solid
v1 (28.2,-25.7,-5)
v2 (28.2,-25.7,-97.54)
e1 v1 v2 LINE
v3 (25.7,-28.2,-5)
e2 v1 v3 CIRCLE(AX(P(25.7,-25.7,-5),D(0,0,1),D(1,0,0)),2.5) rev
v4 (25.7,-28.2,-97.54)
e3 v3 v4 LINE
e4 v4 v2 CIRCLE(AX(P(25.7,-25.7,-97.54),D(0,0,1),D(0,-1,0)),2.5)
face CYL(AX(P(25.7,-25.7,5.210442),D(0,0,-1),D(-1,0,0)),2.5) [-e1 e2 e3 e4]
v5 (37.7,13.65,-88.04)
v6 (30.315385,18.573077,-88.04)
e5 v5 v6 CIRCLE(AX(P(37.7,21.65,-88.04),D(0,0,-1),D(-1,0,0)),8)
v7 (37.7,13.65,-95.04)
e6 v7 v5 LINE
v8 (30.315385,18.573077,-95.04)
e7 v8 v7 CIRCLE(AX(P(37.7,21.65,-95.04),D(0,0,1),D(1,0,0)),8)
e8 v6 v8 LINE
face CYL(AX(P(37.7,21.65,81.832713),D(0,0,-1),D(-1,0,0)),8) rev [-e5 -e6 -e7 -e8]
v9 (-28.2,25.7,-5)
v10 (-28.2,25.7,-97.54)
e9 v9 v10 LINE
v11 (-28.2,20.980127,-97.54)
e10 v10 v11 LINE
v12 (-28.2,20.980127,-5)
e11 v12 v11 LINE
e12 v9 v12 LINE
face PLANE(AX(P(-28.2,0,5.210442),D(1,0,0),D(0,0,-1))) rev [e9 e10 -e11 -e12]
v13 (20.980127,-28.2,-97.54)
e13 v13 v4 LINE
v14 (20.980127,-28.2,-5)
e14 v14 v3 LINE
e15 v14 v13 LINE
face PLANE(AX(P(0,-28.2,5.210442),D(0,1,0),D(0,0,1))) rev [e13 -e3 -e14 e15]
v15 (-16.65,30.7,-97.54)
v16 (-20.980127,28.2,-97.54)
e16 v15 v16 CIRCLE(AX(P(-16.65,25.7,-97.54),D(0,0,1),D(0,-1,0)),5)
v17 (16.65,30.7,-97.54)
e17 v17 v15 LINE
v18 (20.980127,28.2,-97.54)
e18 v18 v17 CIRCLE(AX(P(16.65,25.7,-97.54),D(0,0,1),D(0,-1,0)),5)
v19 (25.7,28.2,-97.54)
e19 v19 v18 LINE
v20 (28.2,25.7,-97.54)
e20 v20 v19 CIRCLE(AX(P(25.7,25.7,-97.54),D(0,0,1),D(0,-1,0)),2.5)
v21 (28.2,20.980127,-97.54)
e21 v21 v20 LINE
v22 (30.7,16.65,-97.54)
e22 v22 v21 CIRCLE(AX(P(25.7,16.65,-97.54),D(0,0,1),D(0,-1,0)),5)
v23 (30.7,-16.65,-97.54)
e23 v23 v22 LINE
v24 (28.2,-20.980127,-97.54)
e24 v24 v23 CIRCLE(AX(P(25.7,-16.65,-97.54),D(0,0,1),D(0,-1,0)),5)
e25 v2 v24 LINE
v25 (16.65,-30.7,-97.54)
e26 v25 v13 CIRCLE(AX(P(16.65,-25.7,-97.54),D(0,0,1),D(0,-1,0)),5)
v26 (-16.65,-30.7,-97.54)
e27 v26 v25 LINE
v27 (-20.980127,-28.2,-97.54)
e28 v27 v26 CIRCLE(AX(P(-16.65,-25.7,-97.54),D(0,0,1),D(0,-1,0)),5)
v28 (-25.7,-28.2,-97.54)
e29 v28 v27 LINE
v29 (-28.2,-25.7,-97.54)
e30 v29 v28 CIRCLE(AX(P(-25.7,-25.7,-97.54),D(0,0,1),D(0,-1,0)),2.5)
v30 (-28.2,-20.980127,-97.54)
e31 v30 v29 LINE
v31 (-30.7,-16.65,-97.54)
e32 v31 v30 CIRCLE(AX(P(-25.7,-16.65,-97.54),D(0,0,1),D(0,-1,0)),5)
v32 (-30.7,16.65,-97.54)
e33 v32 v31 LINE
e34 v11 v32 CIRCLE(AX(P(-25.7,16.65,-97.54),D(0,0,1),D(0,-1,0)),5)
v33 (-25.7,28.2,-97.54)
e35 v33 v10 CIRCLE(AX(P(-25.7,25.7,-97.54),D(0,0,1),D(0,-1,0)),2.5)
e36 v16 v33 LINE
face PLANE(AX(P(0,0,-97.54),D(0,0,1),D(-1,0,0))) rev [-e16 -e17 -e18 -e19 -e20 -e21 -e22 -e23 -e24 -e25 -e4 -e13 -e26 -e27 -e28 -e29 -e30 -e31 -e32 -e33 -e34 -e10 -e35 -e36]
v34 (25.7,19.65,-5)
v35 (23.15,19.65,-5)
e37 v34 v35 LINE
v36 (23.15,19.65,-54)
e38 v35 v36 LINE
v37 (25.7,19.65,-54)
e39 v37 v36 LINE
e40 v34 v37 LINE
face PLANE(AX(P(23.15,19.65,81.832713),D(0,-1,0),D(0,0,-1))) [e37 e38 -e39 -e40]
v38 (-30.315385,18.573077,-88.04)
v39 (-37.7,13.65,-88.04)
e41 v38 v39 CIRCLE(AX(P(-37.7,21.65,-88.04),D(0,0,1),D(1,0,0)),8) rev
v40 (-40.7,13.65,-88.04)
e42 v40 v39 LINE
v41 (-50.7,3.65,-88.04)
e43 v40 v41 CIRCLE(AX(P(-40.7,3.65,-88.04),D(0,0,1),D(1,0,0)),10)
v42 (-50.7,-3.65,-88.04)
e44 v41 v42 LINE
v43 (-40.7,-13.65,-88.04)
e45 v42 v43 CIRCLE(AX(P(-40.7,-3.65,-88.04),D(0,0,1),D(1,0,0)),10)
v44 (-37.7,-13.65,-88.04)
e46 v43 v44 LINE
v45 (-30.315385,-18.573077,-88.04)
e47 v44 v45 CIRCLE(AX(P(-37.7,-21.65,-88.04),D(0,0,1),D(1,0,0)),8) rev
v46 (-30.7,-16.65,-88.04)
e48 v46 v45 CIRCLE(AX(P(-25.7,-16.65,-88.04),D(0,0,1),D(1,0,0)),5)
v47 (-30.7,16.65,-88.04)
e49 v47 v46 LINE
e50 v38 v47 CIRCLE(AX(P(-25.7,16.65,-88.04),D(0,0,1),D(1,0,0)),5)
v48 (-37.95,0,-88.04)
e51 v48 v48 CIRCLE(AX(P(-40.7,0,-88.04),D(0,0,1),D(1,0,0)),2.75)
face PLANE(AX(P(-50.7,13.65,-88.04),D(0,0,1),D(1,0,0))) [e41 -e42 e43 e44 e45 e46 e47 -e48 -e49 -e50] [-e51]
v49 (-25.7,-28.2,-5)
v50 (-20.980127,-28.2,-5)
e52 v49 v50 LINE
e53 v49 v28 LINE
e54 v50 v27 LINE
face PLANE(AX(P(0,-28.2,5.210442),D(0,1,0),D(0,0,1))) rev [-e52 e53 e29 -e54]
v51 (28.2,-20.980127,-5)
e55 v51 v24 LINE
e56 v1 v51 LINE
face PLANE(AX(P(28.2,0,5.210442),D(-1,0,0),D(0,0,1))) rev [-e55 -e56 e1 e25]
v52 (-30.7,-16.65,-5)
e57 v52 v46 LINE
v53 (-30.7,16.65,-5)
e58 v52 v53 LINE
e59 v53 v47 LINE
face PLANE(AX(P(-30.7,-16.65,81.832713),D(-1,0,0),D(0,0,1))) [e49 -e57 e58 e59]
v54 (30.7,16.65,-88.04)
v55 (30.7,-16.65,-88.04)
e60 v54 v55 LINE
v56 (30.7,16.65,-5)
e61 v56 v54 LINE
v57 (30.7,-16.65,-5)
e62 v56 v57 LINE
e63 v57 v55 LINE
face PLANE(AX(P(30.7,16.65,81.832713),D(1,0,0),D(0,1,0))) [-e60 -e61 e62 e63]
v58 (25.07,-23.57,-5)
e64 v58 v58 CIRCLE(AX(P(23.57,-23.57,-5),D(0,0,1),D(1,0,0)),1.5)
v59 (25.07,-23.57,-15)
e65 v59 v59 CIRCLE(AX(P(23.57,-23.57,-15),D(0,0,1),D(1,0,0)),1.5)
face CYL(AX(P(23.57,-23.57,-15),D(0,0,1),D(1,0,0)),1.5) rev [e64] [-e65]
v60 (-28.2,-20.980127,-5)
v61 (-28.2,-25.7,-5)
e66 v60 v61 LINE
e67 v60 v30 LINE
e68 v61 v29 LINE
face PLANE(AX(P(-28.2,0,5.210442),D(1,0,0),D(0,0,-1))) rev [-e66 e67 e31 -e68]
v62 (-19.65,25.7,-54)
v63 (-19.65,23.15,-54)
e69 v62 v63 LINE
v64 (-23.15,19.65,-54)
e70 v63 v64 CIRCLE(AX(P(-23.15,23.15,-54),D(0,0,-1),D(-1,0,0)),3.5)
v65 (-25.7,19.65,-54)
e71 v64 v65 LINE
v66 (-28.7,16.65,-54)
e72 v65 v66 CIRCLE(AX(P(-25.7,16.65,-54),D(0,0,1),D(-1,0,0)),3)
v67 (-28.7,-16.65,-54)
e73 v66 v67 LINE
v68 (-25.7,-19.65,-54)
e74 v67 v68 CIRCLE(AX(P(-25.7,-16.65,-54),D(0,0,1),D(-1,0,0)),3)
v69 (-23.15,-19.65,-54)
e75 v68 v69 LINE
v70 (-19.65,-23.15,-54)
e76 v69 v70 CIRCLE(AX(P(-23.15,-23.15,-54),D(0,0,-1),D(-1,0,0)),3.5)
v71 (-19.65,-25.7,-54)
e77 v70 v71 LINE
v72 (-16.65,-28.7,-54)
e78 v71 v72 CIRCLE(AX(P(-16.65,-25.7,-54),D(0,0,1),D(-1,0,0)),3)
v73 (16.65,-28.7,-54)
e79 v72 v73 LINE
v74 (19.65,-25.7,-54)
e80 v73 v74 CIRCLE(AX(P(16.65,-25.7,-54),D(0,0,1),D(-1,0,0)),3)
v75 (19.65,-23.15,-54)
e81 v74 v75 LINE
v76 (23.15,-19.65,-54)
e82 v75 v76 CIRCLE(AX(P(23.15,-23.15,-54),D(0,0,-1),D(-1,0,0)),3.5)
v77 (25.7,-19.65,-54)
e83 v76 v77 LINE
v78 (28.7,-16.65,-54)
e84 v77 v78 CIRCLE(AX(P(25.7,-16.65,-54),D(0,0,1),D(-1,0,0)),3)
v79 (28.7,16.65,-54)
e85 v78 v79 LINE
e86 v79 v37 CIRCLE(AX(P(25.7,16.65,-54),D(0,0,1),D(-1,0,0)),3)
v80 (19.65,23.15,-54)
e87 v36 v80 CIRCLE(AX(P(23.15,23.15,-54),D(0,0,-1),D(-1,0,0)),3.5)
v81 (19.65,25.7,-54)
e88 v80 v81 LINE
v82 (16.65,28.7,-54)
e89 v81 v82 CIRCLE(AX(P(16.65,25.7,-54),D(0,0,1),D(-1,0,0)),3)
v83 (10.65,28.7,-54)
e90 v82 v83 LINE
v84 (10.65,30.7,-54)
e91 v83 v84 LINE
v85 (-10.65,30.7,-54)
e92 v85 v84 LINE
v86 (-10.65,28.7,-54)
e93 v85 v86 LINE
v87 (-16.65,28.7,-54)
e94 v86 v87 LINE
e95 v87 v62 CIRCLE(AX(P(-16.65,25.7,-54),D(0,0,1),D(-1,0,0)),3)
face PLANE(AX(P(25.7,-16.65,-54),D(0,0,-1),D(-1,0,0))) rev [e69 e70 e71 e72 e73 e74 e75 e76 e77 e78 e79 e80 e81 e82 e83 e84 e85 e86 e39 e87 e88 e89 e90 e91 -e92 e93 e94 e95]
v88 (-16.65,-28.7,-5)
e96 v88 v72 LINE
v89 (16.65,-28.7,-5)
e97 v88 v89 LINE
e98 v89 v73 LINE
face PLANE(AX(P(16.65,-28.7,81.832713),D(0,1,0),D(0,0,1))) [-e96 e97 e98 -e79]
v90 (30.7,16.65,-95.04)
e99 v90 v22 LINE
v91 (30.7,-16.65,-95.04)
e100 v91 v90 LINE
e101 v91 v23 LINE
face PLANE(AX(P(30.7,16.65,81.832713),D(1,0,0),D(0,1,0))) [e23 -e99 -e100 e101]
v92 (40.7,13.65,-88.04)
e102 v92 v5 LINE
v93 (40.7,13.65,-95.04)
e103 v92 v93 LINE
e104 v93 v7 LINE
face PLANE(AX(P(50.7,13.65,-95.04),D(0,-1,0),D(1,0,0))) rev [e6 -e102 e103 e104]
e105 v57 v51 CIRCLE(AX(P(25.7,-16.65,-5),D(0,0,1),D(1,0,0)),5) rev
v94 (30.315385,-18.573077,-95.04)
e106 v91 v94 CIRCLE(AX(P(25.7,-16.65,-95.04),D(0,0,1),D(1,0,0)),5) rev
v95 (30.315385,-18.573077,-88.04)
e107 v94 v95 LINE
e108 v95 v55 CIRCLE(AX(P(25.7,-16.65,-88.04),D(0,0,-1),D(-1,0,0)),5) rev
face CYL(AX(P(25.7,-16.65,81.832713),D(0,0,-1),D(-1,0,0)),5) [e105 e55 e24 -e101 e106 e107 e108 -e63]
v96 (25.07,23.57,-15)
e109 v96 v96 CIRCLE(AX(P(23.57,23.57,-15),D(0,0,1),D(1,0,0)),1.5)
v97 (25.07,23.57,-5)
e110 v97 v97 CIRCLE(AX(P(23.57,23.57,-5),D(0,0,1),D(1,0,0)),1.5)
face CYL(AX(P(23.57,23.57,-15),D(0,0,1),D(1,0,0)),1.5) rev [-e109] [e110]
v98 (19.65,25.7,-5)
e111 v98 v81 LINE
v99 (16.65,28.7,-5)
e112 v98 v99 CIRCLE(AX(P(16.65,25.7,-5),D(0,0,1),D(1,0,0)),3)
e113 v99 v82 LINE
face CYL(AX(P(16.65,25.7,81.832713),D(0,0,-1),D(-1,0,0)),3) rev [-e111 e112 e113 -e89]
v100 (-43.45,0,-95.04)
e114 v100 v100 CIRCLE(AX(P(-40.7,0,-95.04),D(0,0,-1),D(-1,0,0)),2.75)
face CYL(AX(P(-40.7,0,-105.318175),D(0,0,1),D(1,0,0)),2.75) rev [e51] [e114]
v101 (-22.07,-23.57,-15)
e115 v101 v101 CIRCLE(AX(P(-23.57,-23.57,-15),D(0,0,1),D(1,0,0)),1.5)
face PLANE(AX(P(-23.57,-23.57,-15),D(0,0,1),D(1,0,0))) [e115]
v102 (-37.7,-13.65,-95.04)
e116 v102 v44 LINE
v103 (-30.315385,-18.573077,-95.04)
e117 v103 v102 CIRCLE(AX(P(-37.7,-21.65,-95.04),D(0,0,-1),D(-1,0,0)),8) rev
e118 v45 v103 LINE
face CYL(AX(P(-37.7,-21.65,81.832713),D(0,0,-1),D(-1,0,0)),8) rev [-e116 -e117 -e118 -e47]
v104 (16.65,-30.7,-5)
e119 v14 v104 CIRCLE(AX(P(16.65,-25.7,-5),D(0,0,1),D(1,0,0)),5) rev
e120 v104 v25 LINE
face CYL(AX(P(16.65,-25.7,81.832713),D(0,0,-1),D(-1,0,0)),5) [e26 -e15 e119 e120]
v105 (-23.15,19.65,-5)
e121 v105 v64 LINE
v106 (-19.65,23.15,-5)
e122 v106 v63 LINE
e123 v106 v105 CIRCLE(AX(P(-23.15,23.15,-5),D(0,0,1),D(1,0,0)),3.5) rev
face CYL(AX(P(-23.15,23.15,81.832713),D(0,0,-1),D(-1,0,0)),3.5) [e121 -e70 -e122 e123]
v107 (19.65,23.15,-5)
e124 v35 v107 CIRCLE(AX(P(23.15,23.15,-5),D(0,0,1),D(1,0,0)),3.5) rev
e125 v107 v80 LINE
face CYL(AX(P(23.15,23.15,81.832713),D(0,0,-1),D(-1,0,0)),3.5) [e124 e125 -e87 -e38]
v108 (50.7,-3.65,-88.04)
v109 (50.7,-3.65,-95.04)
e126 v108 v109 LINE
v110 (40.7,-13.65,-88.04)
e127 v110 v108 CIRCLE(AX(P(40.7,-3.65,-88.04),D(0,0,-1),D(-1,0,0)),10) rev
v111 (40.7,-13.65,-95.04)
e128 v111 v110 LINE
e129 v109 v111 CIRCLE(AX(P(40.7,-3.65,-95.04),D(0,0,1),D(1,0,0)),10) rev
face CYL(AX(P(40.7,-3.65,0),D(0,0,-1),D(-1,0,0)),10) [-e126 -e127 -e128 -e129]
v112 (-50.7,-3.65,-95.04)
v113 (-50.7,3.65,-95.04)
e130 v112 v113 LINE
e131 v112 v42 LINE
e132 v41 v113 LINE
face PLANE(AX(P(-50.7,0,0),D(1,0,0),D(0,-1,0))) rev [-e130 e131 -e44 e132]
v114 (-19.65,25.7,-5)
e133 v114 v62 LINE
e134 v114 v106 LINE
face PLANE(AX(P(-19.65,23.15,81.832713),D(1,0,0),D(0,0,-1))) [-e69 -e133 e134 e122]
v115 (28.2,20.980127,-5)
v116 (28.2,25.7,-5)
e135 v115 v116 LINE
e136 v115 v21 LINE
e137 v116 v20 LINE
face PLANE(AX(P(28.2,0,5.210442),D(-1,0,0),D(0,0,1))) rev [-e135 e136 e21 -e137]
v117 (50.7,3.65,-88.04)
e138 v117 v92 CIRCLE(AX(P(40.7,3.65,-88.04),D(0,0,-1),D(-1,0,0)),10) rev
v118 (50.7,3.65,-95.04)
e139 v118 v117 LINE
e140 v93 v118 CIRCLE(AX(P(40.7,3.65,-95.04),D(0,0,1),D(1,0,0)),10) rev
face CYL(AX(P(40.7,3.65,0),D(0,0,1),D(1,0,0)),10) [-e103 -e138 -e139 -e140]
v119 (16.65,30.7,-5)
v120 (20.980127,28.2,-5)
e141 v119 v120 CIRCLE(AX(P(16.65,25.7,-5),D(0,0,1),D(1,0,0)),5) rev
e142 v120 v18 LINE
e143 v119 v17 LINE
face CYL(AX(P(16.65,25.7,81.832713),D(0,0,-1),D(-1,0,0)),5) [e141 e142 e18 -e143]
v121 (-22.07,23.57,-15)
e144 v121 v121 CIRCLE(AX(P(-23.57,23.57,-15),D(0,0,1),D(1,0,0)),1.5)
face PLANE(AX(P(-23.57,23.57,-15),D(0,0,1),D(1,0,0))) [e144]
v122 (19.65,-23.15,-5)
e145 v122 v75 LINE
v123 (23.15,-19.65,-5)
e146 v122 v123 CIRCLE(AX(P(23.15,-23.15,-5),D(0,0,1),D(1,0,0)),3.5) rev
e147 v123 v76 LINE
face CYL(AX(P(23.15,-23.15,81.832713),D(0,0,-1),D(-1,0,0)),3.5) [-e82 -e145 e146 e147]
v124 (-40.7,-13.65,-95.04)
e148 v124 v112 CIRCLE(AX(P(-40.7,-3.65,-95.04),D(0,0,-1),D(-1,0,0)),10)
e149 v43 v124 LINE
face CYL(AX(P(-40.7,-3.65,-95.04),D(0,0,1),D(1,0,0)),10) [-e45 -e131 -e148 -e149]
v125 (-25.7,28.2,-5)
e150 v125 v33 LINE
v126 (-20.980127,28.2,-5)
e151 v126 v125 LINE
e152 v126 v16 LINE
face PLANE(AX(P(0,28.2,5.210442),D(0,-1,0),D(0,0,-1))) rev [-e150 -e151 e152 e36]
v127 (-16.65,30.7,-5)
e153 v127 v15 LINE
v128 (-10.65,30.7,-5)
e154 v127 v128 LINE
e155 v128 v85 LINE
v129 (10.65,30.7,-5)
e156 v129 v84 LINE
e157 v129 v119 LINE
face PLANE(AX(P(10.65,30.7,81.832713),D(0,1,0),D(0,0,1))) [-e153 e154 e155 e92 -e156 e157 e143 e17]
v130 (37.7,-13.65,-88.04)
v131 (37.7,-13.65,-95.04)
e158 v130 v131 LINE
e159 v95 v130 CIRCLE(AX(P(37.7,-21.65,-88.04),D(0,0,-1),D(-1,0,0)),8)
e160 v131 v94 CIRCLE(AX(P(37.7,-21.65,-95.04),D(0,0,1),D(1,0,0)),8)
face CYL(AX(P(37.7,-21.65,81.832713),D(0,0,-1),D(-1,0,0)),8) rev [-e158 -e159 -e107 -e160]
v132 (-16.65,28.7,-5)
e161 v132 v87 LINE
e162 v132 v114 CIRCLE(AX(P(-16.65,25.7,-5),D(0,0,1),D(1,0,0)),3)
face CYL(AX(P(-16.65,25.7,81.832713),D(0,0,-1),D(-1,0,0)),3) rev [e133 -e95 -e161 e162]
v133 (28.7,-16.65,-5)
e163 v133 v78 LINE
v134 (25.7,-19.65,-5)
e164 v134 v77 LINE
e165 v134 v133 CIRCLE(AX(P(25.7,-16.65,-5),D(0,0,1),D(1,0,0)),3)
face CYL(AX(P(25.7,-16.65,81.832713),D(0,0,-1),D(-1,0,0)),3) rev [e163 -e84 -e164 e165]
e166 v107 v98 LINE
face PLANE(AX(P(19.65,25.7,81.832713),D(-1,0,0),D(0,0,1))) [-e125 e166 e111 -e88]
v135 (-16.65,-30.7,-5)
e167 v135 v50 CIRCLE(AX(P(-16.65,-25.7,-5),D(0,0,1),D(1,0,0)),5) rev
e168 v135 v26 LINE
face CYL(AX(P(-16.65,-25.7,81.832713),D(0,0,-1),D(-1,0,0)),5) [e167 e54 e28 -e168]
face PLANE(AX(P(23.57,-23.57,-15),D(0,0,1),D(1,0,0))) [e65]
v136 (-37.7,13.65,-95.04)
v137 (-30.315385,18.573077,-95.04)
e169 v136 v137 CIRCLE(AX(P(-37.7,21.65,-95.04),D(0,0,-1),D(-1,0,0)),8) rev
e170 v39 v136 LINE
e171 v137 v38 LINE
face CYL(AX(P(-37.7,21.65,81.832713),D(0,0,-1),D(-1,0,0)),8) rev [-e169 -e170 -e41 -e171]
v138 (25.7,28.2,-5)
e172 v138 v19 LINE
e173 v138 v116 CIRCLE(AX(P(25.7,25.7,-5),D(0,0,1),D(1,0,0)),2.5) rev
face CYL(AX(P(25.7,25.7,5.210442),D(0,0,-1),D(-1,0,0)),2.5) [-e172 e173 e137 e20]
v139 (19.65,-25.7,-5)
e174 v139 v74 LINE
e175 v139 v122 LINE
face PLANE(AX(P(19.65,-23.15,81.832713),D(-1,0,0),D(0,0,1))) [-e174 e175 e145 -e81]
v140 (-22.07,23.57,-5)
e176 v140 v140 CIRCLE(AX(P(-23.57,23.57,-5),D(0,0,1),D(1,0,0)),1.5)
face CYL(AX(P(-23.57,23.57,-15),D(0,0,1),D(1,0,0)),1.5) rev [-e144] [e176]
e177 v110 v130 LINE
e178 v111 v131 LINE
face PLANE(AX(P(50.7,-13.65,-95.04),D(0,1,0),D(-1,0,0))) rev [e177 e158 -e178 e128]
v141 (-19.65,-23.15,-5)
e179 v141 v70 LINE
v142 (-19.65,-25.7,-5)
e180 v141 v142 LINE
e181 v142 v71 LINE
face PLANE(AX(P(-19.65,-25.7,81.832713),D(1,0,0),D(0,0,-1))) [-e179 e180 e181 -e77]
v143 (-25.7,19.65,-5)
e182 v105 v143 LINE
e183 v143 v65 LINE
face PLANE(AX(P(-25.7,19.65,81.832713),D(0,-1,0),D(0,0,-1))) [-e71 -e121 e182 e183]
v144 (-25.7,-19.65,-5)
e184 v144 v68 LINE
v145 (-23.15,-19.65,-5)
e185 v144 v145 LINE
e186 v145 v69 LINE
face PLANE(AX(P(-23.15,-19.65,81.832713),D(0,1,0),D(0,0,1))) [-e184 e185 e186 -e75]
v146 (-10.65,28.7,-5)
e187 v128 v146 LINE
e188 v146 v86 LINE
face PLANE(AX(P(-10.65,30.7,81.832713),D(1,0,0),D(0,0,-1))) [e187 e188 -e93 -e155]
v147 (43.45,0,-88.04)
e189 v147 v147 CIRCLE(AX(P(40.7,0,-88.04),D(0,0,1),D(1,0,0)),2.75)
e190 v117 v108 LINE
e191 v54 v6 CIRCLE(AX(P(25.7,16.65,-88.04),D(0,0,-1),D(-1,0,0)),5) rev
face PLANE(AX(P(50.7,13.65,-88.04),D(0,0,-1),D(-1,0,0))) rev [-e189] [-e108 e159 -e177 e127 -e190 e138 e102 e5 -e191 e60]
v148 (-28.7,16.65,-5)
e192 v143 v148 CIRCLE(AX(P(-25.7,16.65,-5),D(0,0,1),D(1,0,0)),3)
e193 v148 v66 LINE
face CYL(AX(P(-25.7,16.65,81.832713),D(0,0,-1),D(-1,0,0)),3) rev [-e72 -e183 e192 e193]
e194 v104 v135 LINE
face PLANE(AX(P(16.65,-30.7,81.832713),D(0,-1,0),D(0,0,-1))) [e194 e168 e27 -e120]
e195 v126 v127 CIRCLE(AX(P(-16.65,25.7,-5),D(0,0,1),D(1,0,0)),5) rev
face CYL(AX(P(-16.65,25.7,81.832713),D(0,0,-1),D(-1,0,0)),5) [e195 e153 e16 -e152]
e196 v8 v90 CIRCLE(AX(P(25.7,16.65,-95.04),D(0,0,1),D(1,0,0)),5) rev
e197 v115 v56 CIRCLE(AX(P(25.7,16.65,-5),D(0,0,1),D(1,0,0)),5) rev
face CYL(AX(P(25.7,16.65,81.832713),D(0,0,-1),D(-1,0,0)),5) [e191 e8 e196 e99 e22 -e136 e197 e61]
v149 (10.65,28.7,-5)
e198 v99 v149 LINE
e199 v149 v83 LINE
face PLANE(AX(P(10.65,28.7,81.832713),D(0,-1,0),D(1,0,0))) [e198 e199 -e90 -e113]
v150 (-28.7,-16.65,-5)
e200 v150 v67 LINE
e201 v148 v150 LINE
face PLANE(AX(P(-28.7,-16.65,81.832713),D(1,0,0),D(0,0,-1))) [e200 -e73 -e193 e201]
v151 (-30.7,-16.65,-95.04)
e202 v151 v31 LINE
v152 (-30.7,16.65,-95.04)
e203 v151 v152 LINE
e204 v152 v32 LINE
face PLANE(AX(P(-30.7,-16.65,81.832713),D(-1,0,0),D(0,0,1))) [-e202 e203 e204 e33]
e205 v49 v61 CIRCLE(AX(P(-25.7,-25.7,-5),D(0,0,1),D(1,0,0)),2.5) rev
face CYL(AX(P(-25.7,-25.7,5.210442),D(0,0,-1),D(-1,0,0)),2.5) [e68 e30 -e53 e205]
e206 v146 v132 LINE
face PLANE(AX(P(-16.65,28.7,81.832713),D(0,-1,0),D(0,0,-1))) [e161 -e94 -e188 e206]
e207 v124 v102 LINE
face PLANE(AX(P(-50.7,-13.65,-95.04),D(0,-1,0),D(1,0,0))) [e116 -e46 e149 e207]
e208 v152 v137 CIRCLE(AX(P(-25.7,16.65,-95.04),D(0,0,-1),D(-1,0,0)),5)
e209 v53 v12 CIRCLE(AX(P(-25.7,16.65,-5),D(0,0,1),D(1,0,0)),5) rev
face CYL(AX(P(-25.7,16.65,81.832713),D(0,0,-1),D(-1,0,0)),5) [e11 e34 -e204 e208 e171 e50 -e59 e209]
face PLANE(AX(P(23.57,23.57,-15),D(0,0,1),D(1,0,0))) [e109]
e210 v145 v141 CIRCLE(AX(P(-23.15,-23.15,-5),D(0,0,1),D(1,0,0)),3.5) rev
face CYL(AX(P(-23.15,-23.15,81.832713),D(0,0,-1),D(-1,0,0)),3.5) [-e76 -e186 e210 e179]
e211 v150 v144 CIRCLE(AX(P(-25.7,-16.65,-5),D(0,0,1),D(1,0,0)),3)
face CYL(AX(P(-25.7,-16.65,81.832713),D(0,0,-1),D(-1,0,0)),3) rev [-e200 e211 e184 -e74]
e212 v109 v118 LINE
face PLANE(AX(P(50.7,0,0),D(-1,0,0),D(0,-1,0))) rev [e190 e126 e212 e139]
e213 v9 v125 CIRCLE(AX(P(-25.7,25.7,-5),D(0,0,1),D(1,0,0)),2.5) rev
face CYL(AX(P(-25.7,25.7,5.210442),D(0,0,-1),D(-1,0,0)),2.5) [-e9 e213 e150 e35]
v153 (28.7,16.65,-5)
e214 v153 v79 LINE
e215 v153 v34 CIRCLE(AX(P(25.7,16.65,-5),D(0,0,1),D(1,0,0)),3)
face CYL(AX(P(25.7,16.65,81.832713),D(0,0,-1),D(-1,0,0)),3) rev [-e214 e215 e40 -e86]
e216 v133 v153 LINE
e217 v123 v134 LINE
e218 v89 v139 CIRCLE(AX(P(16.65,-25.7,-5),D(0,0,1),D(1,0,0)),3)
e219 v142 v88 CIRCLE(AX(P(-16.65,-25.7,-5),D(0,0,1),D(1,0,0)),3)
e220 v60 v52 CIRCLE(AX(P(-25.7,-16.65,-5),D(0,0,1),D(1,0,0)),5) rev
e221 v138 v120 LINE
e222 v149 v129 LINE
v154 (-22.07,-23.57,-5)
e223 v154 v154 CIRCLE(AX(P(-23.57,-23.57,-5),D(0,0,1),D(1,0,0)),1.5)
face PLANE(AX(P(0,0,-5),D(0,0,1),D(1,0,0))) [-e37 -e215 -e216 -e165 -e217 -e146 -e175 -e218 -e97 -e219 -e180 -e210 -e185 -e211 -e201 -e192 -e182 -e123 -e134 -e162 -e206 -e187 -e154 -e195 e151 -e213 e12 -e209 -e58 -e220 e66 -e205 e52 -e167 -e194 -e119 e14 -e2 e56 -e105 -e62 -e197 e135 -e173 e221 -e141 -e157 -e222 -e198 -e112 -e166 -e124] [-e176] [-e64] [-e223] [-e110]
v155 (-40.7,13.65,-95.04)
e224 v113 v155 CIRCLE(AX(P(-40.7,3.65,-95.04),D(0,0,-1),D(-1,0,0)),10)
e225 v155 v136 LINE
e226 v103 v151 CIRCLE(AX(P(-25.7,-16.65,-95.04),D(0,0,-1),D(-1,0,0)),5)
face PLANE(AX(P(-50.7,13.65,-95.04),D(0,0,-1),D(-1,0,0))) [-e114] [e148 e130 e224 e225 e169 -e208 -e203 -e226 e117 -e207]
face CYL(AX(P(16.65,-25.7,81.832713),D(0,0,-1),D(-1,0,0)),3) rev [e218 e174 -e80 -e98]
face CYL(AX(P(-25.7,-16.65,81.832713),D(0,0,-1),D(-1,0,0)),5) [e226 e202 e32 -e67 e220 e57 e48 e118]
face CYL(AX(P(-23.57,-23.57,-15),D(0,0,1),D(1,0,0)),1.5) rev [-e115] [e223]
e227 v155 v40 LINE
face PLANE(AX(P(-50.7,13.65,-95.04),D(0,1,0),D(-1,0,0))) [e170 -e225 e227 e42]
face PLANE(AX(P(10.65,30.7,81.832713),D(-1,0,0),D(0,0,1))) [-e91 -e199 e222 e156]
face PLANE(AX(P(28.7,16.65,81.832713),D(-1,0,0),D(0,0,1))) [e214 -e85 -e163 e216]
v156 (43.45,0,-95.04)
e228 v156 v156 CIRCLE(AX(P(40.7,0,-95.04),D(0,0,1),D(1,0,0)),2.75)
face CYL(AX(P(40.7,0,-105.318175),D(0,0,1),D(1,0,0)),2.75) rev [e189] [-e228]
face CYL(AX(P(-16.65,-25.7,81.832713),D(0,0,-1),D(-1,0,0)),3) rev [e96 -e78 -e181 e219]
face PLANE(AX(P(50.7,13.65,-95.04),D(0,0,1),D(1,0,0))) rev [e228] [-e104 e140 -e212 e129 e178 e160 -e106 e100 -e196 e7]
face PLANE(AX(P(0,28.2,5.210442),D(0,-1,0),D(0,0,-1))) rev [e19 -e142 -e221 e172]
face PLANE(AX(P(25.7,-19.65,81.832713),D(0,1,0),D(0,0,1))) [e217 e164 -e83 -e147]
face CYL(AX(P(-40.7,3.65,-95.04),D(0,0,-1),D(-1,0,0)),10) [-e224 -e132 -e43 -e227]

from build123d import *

# Parameters (mm, degrees)
BOSS_EXTRUDE1_DEPTH = 49
BOSS_EXTRUDE2_START = 1.5
BOSS_EXTRUDE2_DEPTH = 1.5
BOSS_EXTRUDE3_DEPTH = 50.5
SKETCH4_R           = 1.5
CUT_EXTRUDE1_DEPTH  = 10
BOSS_EXTRUDE4_START = 42.04
BOSS_EXTRUDE4_DEPTH = 42.04
SKETCH7_W           = 7
SKETCH7_H           = 27.3
BOSS_EXTRUDE5_DEPTH = 20
FILLET1_R           = 10
FILLET2_R           = 8
FILLET3_R           = 10
FILLET4_R           = 8
SKETCH8_R           = 2.75
CUT_EXTRUDE2_DEPTH  = 9.5


with BuildPart() as part:
    # Sketch1 → Boss-Extrude1 (new body)
    with BuildSketch(Plane(origin=(0, 0, -54), x_dir=(-1, 0, 0), z_dir=(0, 0, -1))):
        with BuildLine():
            Line((-25.7, -19.65), (-23.15, -19.65))
            ThreePointArc((-23.15, -19.65), (-20.675126266, -20.675126266), (-19.65, -23.15))
            Line((-19.65, -23.15), (-19.65, -25.7))
            ThreePointArc((-19.65, -25.7), (-18.771320344, -27.821320344), (-16.65, -28.7))
            Line((-16.65, -28.7), (16.65, -28.7))
            ThreePointArc((16.65, -28.7), (18.771320344, -27.821320344), (19.65, -25.7))
            Line((19.65, -25.7), (19.65, -23.15))
            ThreePointArc((19.65, -23.15), (20.675126266, -20.675126266), (23.15, -19.65))
            Line((23.15, -19.65), (25.7, -19.65))
            ThreePointArc((25.7, -19.65), (27.821320344, -18.771320344), (28.7, -16.65))
            Line((28.7, -16.65), (28.7, 16.65))
            ThreePointArc((28.7, 16.65), (27.821320344, 18.771320344), (25.7, 19.65))
            Line((25.7, 19.65), (23.15, 19.65))
            ThreePointArc((23.15, 19.65), (20.675126266, 20.675126266), (19.65, 23.15))
            Line((19.65, 23.15), (19.65, 25.7))
            ThreePointArc((19.65, 25.7), (18.771320344, 27.821320344), (16.65, 28.7))
            Line((16.65, 28.7), (10.65, 28.7))
            Line((10.65, 28.7), (10.65, 30.7))
            Line((10.65, 30.7), (16.65, 30.7))
            ThreePointArc((16.65, 30.7), (20.185533906, 29.235533906), (21.65, 25.7))
            Line((21.65, 25.7), (21.65, 23.15))
            ThreePointArc((21.65, 23.15), (22.089339828, 22.089339828), (23.15, 21.65))
            Line((23.15, 21.65), (25.7, 21.65))
            ThreePointArc((25.7, 21.65), (29.235533906, 20.185533906), (30.7, 16.65))
            Line((30.7, 16.65), (30.7, -16.65))
            ThreePointArc((30.7, -16.65), (29.235533906, -20.185533906), (25.7, -21.65))
            Line((25.7, -21.65), (23.15, -21.65))
            ThreePointArc((23.15, -21.65), (22.089339828, -22.089339828), (21.65, -23.15))
            Line((21.65, -23.15), (21.65, -25.7))
            ThreePointArc((21.65, -25.7), (20.185533906, -29.235533906), (16.65, -30.7))
            Line((16.65, -30.7), (-16.65, -30.7))
            ThreePointArc((-16.65, -30.7), (-20.185533906, -29.235533906), (-21.65, -25.7))
            Line((-21.65, -25.7), (-21.65, -23.15))
            ThreePointArc((-21.65, -23.15), (-22.089339828, -22.089339828), (-23.15, -21.65))
            Line((-23.15, -21.65), (-25.7, -21.65))
            ThreePointArc((-25.7, -21.65), (-29.235533906, -20.185533906), (-30.7, -16.65))
            Line((-30.7, -16.65), (-30.7, 16.65))
            ThreePointArc((-30.7, 16.65), (-29.235533906, 20.185533906), (-25.7, 21.65))
            Line((-25.7, 21.65), (-23.15, 21.65))
            ThreePointArc((-23.15, 21.65), (-22.089339828, 22.089339828), (-21.65, 23.15))
            Line((-21.65, 23.15), (-21.65, 25.7))
            ThreePointArc((-21.65, 25.7), (-20.185533906, 29.235533906), (-16.65, 30.7))
            Line((-16.65, 30.7), (-10.65, 30.7))
            Line((-10.65, 30.7), (-10.65, 28.7))
            Line((-10.65, 28.7), (-16.65, 28.7))
            ThreePointArc((-16.65, 28.7), (-18.771320344, 27.821320344), (-19.65, 25.7))
            Line((-19.65, 25.7), (-19.65, 23.15))
            ThreePointArc((-19.65, 23.15), (-20.675126266, 20.675126266), (-23.15, 19.65))
            Line((-23.15, 19.65), (-25.7, 19.65))
            ThreePointArc((-25.7, 19.65), (-27.821320344, 18.771320344), (-28.7, 16.65))
            Line((-28.7, 16.65), (-28.7, -16.65))
            ThreePointArc((-28.7, -16.65), (-27.821320344, -18.771320344), (-25.7, -19.65))
        make_face()
    extrude(amount=-BOSS_EXTRUDE1_DEPTH)

    # Sketch2 → Boss-Extrude2 (add)
    with BuildSketch(Plane(origin=(0, 0, -54), x_dir=(-1, 0, 0), z_dir=(0, 0, -1)).offset(BOSS_EXTRUDE2_START)):
        with BuildLine():
            Line((-10.65, 30.7), (10.65, 30.7))
            Line((10.65, 30.7), (16.65, 30.7))
            ThreePointArc((16.65, 30.7), (20.185533906, 29.235533906), (21.65, 25.7))
            Line((21.65, 25.7), (21.65, 23.15))
            ThreePointArc((21.65, 23.15), (22.089339828, 22.089339828), (23.15, 21.65))
            Line((23.15, 21.65), (25.7, 21.65))
            ThreePointArc((25.7, 21.65), (29.235533906, 20.185533906), (30.7, 16.65))
            Line((30.7, 16.65), (30.7, -16.65))
            ThreePointArc((30.7, -16.65), (29.235533906, -20.185533906), (25.7, -21.65))
            Line((25.7, -21.65), (23.15, -21.65))
            ThreePointArc((23.15, -21.65), (22.089339828, -22.089339828), (21.65, -23.15))
            Line((21.65, -23.15), (21.65, -25.7))
            ThreePointArc((21.65, -25.7), (20.185533906, -29.235533906), (16.65, -30.7))
            Line((16.65, -30.7), (-16.65, -30.7))
            ThreePointArc((-16.65, -30.7), (-20.185533906, -29.235533906), (-21.65, -25.7))
            Line((-21.65, -25.7), (-21.65, -23.15))
            ThreePointArc((-21.65, -23.15), (-22.089339828, -22.089339828), (-23.15, -21.65))
            Line((-23.15, -21.65), (-25.7, -21.65))
            ThreePointArc((-25.7, -21.65), (-29.235533906, -20.185533906), (-30.7, -16.65))
            Line((-30.7, -16.65), (-30.7, 16.65))
            ThreePointArc((-30.7, 16.65), (-29.235533906, 20.185533906), (-25.7, 21.65))
            Line((-25.7, 21.65), (-23.15, 21.65))
            ThreePointArc((-23.15, 21.65), (-22.089339828, 22.089339828), (-21.65, 23.15))
            Line((-21.65, 23.15), (-21.65, 25.7))
            ThreePointArc((-21.65, 25.7), (-20.185533906, 29.235533906), (-16.65, 30.7))
            Line((-16.65, 30.7), (-10.65, 30.7))
        make_face()
    extrude(amount=-BOSS_EXTRUDE2_DEPTH)

    # Sketch3 → Boss-Extrude3 (add)
    with BuildSketch(Plane(origin=(0, 0, -55.5), x_dir=(-1, 0, 0), z_dir=(0, 0, -1))):
        with BuildLine():
            Line((-21.65, 23.15), (-21.65, 25.7))
            ThreePointArc((-21.65, 25.7), (-21.479629131, 26.994095226), (-20.980127019, 28.2))
            Line((-20.980127019, 28.2), (-25.7, 28.2))
            ThreePointArc((-25.7, 28.2), (-27.467766953, 27.467766953), (-28.2, 25.7))
            Line((-28.2, 25.7), (-28.2, 20.980127019))
            ThreePointArc((-28.2, 20.980127019), (-26.994095226, 21.479629131), (-25.7, 21.65))
            Line((-25.7, 21.65), (-23.15, 21.65))
            ThreePointArc((-23.15, 21.65), (-22.089339828, 22.089339828), (-21.65, 23.15))
        make_face()
        with BuildLine():
            Line((21.65, 25.7), (21.65, 23.15))
            ThreePointArc((21.65, 23.15), (22.089339828, 22.089339828), (23.15, 21.65))
            Line((23.15, 21.65), (25.7, 21.65))
            ThreePointArc((25.7, 21.65), (26.994095226, 21.479629131), (28.2, 20.980127019))
            Line((28.2, 20.980127019), (28.2, 25.7))
            ThreePointArc((28.2, 25.7), (27.467766953, 27.467766953), (25.7, 28.2))
            Line((25.7, 28.2), (20.980127019, 28.2))
            ThreePointArc((20.980127019, 28.2), (21.479629131, 26.994095226), (21.65, 25.7))
        make_face()
        with BuildLine():
            Line((-23.15, -21.65), (-25.7, -21.65))
            ThreePointArc((-25.7, -21.65), (-26.994095226, -21.479629131), (-28.2, -20.980127019))
            Line((-28.2, -20.980127019), (-28.2, -25.7))
            ThreePointArc((-28.2, -25.7), (-27.467766953, -27.467766953), (-25.7, -28.2))
            Line((-25.7, -28.2), (-20.980127019, -28.2))
            ThreePointArc((-20.980127019, -28.2), (-21.479629131, -26.994095226), (-21.65, -25.7))
            Line((-21.65, -25.7), (-21.65, -23.15))
            ThreePointArc((-21.65, -23.15), (-22.089339828, -22.089339828), (-23.15, -21.65))
        make_face()
        with BuildLine():
            Line((20.980127019, -28.2), (25.7, -28.2))
            ThreePointArc((25.7, -28.2), (27.467766953, -27.467766953), (28.2, -25.7))
            Line((28.2, -25.7), (28.2, -20.980127019))
            ThreePointArc((28.2, -20.980127019), (26.994095226, -21.479629131), (25.7, -21.65))
            Line((25.7, -21.65), (23.15, -21.65))
            ThreePointArc((23.15, -21.65), (22.089339828, -22.089339828), (21.65, -23.15))
            Line((21.65, -23.15), (21.65, -25.7))
            ThreePointArc((21.65, -25.7), (21.479629131, -26.994095226), (20.980127019, -28.2))
        make_face()
    extrude(amount=-BOSS_EXTRUDE3_DEPTH)

    # Sketch4 → Cut-Extrude1 (cut)
    with BuildSketch(Plane.XY.offset(-5)):
        with Locations((-23.57, 23.57)):
            Circle(SKETCH4_R)
        with Locations((23.57, 23.57)):
            Circle(SKETCH4_R)
        with Locations((-23.57, -23.57)):
            Circle(SKETCH4_R)
        with Locations((23.57, -23.57)):
            Circle(SKETCH4_R)
    extrude(amount=-CUT_EXTRUDE1_DEPTH, mode=Mode.SUBTRACT)

    # Sketch5 → Boss-Extrude4 (add)
    with BuildSketch(Plane(origin=(0, 0, -55.5), x_dir=(-1, 0, 0), z_dir=(0, 0, -1)).offset(BOSS_EXTRUDE4_START)):
        with BuildLine():
            Line((28.2, -25.7), (28.2, -20.980127019))
            ThreePointArc((28.2, -20.980127019), (30.030127019, -19.15), (30.7, -16.65))
            Line((30.7, -16.65), (30.7, 16.65))
            ThreePointArc((30.7, 16.65), (30.030127019, 19.15), (28.2, 20.980127019))
            Line((28.2, 20.980127019), (28.2, 25.7))
            ThreePointArc((28.2, 25.7), (27.467766953, 27.467766953), (25.7, 28.2))
            Line((25.7, 28.2), (20.980127019, 28.2))
            ThreePointArc((20.980127019, 28.2), (19.15, 30.030127019), (16.65, 30.7))
            Line((16.65, 30.7), (-16.65, 30.7))
            ThreePointArc((-16.65, 30.7), (-19.15, 30.030127019), (-20.980127019, 28.2))
            Line((-20.980127019, 28.2), (-25.7, 28.2))
            ThreePointArc((-25.7, 28.2), (-27.467766953, 27.467766953), (-28.2, 25.7))
            Line((-28.2, 25.7), (-28.2, 20.980127019))
            ThreePointArc((-28.2, 20.980127019), (-30.030127019, 19.15), (-30.7, 16.65))
            Line((-30.7, 16.65), (-30.7, -16.65))
            ThreePointArc((-30.7, -16.65), (-30.030127019, -19.15), (-28.2, -20.980127019))
            Line((-28.2, -20.980127019), (-28.2, -25.7))
            ThreePointArc((-28.2, -25.7), (-27.467766953, -27.467766953), (-25.7, -28.2))
            Line((-25.7, -28.2), (-20.980127019, -28.2))
            ThreePointArc((-20.980127019, -28.2), (-19.15, -30.030127019), (-16.65, -30.7))
            Line((-16.65, -30.7), (16.65, -30.7))
            ThreePointArc((16.65, -30.7), (19.15, -30.030127019), (20.980127019, -28.2))
            Line((20.980127019, -28.2), (25.7, -28.2))
            ThreePointArc((25.7, -28.2), (27.467766953, -27.467766953), (28.2, -25.7))
        make_face()
    extrude(amount=-BOSS_EXTRUDE4_DEPTH)

    # Sketch7 → Boss-Extrude5 (add)
    with BuildSketch(Plane(origin=(30.7, 0, 0), x_dir=(0, 0, -1), z_dir=(1, 0, 0))):
        with Locations((91.54, 0)):
            Rectangle(SKETCH7_W, SKETCH7_H)
    boss_extrude5 = extrude(amount=BOSS_EXTRUDE5_DEPTH)

    # Fillet1
    fillet1_edges = [part.edges().sort_by_distance(p)[0] for p in [
        (50.7, 13.65, -91.54),
        (50.7, -13.65, -91.54),
    ]]
    fillet(fillet1_edges, radius=FILLET1_R)

    # Fillet2
    # the kernel refuses this fillet: 8 mm, written as the material it adds along each edge
    with BuildSketch(Plane(origin=(30.7, 13.65, -95.04), x_dir=(-0.07788766729291054, 0.9969621413492434, 0), z_dir=(0, 0, 1))) as fillet2_piece_1:
        with BuildLine():
            CenterArc((7.43048346, -7.601836328), FILLET2_R, 108.152705887, 67.380135052)
            Line((-0.545213671, -6.978734989), (-1.342783384, -6.916424856))
            Line((-1.342783384, -6.916424856), (-0.797569713, 0.062310134))
            Line((-0.797569713, 0.062310134), (0.062310134, 0.797569713))
            ThreePointArc((0.062310134, 0.797569713), (3.053196558, 0.563906711), (4.688837571, 0.760183633))
            Line((4.688837571, 0.760183633), (4.938078106, 0))
        make_face()
    extrude(amount=7)
    with BuildSketch(Plane(origin=(30.7, -13.65, -88.04), x_dir=(1, 0, 0), z_dir=(0, 0, -1))) as fillet2_piece_2:
        with BuildLine():
            CenterArc((7, 8), FILLET2_R, 202.619864948, 67.380135052)
            Line((-0.384615385, 4.923076923), (-1.123076923, 4.615384615))
            ThreePointArc((-1.123076923, 4.615384615), (-0.8, 3), (-0.8, 0))
            Line((-0.8, 0), (0, -0.8))
            Line((0, -0.8), (7, -0.8))
            Line((7, -0.8), (7, 0))
        make_face()
    extrude(amount=7)

    # Mirror1: Boss-Extrude5 across plane
    add(boss_extrude5.mirror(Plane(origin=(0, 0, 0), x_dir=(0, 0, 1), z_dir=(1, 0, 0))))

    # Fillet3
    fillet3_edges = [part.edges().sort_by_distance(p)[0] for p in [
        (-50.7, -13.65, -91.54),
        (-50.7, 13.65, -91.54),
    ]]
    fillet(fillet3_edges, radius=FILLET3_R)

    # Fillet4
    # the kernel refuses this fillet: 8 mm, written as the material it adds along each edge
    with BuildSketch(Plane(origin=(-30.7, 13.65, -95.04), x_dir=(-1, 0, 0), z_dir=(0, 0, 1))) as fillet4_piece_1:
        with BuildLine():
            CenterArc((7, -8), FILLET4_R, 90, 67.380135052)
            Line((-0.384615385, -4.923076923), (-1.123076923, -4.615384615))
            ThreePointArc((-1.123076923, -4.615384615), (-0.8, -3), (-0.8, 0))
            Line((-0.8, 0), (0, 0.8))
            Line((0, 0.8), (7, 0.8))
            Line((7, 0.8), (7, 0))
        make_face()
    extrude(amount=7)
    with BuildSketch(Plane(origin=(-30.7, -13.65, -88.04), x_dir=(0.07788766729291037, -0.9969621413492434, 0), z_dir=(0, 0, -1))) as fillet4_piece_2:
        with BuildLine():
            CenterArc((7.43048346, 7.601836328), FILLET4_R, 184.467159061, 67.380135052)
            Line((-0.545213671, 6.978734989), (-1.342783384, 6.916424856))
            Line((-1.342783384, 6.916424856), (-0.797569713, -0.062310134))
            Line((-0.797569713, -0.062310134), (0.062310134, -0.797569713))
            ThreePointArc((0.062310134, -0.797569713), (3.053196558, -0.563906711), (4.688837571, -0.760183633))
            Line((4.688837571, -0.760183633), (4.938078106, 0))
        make_face()
    extrude(amount=7)

    # Sketch8 → Cut-Extrude2 (cut)
    with BuildSketch(Plane.XY.offset(-88.04)):
        with Locations((40.7, 0)):
            Circle(SKETCH8_R)
        with Locations((-40.7, 0)):
            Circle(SKETCH8_R)
    extrude(amount=-CUT_EXTRUDE2_DEPTH, mode=Mode.SUBTRACT)


solid = part.part
